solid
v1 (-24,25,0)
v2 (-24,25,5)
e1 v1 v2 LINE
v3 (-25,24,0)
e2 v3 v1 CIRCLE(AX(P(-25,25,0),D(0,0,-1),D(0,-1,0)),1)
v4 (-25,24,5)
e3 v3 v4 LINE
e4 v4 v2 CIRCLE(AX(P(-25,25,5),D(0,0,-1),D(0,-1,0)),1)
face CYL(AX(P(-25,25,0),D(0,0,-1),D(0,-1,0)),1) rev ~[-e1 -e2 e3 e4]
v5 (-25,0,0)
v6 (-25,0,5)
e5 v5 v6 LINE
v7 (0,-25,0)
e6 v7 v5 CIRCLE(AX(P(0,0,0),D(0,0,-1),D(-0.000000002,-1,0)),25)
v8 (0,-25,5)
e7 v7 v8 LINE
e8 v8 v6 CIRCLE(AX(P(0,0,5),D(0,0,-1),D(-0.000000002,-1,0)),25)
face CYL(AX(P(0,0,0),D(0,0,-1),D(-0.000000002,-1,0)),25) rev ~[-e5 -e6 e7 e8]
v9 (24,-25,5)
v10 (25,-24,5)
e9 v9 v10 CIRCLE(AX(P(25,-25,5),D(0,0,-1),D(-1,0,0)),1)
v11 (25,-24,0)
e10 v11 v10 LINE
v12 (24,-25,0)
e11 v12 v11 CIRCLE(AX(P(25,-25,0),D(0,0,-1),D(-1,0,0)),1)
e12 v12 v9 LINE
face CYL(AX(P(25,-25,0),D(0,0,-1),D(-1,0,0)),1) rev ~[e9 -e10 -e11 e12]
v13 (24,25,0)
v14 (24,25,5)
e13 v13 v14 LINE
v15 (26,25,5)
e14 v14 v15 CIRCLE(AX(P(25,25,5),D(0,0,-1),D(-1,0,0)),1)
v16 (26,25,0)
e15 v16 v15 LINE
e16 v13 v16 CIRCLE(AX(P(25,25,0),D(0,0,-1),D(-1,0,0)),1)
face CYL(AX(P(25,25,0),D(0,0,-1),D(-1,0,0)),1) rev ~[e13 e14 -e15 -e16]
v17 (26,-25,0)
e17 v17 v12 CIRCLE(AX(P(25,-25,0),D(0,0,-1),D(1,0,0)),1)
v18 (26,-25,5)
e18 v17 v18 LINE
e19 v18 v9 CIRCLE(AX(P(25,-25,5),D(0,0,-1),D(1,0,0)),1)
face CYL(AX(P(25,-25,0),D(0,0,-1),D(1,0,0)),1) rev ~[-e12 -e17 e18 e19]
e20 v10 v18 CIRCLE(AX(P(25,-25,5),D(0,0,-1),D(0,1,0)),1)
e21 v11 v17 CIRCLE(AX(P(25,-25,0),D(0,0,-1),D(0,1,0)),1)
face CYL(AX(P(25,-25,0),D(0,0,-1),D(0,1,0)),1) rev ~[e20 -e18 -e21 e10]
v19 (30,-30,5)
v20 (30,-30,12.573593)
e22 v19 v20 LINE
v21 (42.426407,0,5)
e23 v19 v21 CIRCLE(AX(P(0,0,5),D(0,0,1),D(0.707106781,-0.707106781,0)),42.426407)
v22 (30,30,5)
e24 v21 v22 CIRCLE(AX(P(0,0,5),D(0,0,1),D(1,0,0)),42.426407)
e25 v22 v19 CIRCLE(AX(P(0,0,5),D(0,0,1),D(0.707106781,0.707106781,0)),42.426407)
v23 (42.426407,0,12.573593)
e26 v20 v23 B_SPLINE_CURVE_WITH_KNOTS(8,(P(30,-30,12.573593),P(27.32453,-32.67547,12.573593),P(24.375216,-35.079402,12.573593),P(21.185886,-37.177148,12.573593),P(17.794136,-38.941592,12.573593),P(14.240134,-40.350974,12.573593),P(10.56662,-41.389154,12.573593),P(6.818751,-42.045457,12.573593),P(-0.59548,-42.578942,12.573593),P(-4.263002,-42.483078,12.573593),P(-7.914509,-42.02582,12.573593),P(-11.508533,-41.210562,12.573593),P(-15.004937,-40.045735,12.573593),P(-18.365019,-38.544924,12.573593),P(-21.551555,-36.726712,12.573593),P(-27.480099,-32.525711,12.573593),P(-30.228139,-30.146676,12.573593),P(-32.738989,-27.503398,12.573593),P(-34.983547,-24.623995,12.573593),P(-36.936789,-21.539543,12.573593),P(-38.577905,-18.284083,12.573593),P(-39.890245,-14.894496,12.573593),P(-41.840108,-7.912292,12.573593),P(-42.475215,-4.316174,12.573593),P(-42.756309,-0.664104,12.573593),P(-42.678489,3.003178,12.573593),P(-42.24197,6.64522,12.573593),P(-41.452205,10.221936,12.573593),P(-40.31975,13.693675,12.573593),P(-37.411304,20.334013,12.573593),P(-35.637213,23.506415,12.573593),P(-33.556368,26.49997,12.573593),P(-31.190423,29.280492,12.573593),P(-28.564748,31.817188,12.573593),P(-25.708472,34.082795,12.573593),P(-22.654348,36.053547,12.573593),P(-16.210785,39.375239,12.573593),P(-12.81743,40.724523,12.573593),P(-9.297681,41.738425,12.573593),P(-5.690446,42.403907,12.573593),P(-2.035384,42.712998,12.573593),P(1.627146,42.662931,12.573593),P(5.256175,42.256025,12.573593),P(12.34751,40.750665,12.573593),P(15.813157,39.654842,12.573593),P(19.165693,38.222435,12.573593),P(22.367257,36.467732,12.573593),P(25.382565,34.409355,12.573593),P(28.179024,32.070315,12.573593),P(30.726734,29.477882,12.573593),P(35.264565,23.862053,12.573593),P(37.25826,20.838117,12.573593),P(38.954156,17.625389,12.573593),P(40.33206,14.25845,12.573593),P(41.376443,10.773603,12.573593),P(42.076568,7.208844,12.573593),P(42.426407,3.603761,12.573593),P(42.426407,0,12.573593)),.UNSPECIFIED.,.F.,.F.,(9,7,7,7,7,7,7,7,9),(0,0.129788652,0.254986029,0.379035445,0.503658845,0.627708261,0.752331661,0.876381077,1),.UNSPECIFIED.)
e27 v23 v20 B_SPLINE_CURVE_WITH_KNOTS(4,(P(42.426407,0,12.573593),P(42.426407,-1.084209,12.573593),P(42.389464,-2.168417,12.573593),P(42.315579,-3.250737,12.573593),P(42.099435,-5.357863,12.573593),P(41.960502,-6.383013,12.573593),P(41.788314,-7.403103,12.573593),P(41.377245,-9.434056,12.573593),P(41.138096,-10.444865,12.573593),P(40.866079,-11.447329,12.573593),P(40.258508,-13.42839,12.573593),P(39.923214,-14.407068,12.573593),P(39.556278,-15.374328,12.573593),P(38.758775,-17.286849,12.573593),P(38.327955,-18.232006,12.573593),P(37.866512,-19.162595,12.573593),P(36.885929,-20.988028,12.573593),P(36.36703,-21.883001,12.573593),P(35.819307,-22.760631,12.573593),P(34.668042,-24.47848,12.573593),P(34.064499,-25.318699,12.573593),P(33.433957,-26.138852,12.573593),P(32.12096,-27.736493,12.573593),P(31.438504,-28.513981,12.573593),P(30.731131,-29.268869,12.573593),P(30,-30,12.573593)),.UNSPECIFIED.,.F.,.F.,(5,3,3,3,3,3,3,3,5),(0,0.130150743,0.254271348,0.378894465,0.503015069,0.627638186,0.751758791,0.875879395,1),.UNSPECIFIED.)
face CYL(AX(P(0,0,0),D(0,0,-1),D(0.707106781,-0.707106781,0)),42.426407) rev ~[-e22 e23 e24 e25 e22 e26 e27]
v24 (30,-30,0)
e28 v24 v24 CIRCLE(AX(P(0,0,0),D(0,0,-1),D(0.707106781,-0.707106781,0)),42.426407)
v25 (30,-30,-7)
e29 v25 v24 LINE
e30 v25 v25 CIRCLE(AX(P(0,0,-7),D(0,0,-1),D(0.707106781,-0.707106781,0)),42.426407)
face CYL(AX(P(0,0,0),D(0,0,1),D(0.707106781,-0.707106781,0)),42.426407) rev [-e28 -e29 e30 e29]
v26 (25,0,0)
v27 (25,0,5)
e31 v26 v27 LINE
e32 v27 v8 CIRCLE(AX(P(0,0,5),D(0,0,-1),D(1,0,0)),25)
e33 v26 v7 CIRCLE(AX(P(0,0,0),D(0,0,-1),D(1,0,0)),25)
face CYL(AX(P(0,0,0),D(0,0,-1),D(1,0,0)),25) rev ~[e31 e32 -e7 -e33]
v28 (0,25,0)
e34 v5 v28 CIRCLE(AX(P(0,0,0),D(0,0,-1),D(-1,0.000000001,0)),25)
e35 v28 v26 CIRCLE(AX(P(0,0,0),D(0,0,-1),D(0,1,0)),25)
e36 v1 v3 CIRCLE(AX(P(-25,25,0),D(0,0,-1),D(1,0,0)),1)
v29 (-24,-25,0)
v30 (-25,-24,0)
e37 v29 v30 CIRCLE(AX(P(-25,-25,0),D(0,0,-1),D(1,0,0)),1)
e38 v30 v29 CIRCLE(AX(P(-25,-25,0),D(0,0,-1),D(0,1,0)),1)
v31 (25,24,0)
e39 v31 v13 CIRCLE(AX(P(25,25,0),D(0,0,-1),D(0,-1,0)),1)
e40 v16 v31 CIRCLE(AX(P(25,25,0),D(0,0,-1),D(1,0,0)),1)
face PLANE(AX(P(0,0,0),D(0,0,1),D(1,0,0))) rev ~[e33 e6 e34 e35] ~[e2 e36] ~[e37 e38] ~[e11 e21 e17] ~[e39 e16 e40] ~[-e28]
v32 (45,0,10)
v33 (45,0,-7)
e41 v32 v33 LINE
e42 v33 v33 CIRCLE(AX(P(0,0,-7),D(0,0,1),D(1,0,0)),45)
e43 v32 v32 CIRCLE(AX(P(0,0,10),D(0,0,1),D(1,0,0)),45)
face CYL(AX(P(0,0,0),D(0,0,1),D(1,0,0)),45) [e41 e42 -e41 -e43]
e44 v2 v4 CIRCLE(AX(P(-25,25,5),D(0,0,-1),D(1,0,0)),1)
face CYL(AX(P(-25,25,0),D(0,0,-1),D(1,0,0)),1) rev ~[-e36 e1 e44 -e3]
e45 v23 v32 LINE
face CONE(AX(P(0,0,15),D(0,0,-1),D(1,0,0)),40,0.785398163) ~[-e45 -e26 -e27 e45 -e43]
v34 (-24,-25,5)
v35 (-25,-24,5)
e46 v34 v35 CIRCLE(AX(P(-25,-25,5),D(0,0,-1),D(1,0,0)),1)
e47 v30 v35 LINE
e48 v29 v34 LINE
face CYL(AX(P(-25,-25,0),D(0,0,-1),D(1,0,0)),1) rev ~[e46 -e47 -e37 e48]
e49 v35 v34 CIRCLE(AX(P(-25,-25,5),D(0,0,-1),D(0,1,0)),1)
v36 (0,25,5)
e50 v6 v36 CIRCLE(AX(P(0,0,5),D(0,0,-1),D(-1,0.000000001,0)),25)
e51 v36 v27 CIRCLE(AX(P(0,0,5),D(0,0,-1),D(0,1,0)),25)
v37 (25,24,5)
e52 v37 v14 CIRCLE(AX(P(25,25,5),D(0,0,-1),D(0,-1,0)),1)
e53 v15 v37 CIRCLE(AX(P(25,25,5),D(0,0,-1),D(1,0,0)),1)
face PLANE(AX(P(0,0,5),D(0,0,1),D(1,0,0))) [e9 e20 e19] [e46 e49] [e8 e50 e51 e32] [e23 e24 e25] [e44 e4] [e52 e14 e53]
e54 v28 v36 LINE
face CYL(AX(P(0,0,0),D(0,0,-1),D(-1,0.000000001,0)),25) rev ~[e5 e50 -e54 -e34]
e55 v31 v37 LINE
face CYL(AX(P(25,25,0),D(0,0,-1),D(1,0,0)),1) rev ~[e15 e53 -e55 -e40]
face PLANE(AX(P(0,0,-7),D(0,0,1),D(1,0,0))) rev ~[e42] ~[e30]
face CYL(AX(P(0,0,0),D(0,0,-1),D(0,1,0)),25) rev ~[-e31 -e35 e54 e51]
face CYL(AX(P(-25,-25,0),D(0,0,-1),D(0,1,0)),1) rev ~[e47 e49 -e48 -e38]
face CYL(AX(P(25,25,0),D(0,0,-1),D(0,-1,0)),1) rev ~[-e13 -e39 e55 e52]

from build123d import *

# Parameters (mm, degrees)
F0_W     = 60
F0_H     = 60
F1_DEPTH = 5
F0_R     = 45
F2_DEPTH = 15
F4_DEPTH = 4
F5_DEPTH = 7


# Not quite as in the source:
# - a fillet or chamfer that OpenCascade refuses, or shapes differently, is made with other operations: its cross-section is extruded or revolved along the edge and cut away or added


with BuildPart() as f1:
    # F0 (on Top) → F1 (new body)
    with BuildSketch(Plane.XY):
        Rectangle(F0_W, F0_H)
        with BuildLine():
            Line((25, 24), (25, 0))
            Line((25, 0), (25, -24))
            ThreePointArc((25, -24), (25.7071067812, -24.2928932188), (26, -25))
            ThreePointArc((26, -25), (25, -26), (24, -25))
            Line((24, -25), (-5.83e-08, -25))
            Line((-5.83e-08, -25), (-24, -25))
            ThreePointArc((-24, -25), (-25.7071067812, -25.7071067812), (-25, -24))
            Line((-25, -24), (-25, 2.61e-08))
            Line((-25, 2.61e-08), (-25, 24))
            ThreePointArc((-25, 24), (-25.7071067812, 25.7071067812), (-24, 25))
            Line((-24, 25), (0, 25))
            Line((0, 25), (24, 25))
            ThreePointArc((24, 25), (25, 26), (26, 25))
            ThreePointArc((26, 25), (25.7071067812, 24.2928932188), (25, 24))
        make_face(mode=Mode.SUBTRACT)
        with BuildLine():
            ThreePointArc((0, 25), (17.6776695297, 17.6776695297), (25, 0))
            Line((25, 0), (25, 24))
            ThreePointArc((25, 24), (24.2928932188, 24.2928932188), (24, 25))
            Line((24, 25), (0, 25))
        make_face()
        with BuildLine():
            Line((30, 30), (30, -30))
            ThreePointArc((30, -30), (39.1968889463, -16.2358830044), (42.4264068712, 0))
            ThreePointArc((42.4264068712, 0), (39.1968889463, 16.2358830044), (30, 30))
        make_face()
        with BuildLine():
            ThreePointArc((-30, -30), (0, -42.4264068712), (30, -30))
            Line((30, -30), (-30, -30))
        make_face()
        with BuildLine():
            ThreePointArc((-30, 30), (-42.4264068712, 0), (-30, -30))
            Line((-30, -30), (-30, 30))
        make_face()
        with BuildLine():
            Line((-24, -25), (-5.83e-08, -25))
            ThreePointArc((-5.83e-08, -25), (-17.6776695595, -17.6776694998), (-25, 2.61e-08))
            Line((-25, 2.61e-08), (-25, -24))
            ThreePointArc((-25, -24), (-24.2928932188, -24.2928932188), (-24, -25))
        make_face()
        with BuildLine():
            Line((25, -24), (25, 0))
            ThreePointArc((25, 0), (17.677669509, -17.6776695503), (-5.83e-08, -25))
            Line((-5.83e-08, -25), (24, -25))
            ThreePointArc((24, -25), (24.2928932188, -24.2928932188), (25, -24))
        make_face()
        with BuildLine():
            ThreePointArc((-25, 2.61e-08), (-17.6776695204, 17.6776695389), (0, 25))
            Line((0, 25), (-24, 25))
            ThreePointArc((-24, 25), (-24.2928932188, 24.2928932188), (-25, 24))
            Line((-25, 24), (-25, 2.61e-08))
        make_face()
        with BuildLine():
            Line((-30, 30), (30, 30))
            ThreePointArc((30, 30), (0, 42.4264068712), (-30, 30))
        make_face()
    extrude(amount=F1_DEPTH)

    # F0 (on Top) → F2 (join)
    with BuildSketch(Plane.XY):
        Circle(F0_R)
        with BuildLine():
            ThreePointArc((42.4264068712, 0), (39.1968889463, -16.2358830044), (30, -30))
            ThreePointArc((30, -30), (0, -42.4264068712), (-30, -30))
            ThreePointArc((-30, -30), (-42.4264068712, 0), (-30, 30))
            ThreePointArc((-30, 30), (0, 42.4264068712), (30, 30))
            ThreePointArc((30, 30), (39.1968889463, 16.2358830044), (42.4264068712, 0))
        make_face(mode=Mode.SUBTRACT)
    extrude(amount=F2_DEPTH)

    # F3: chamfer of 5 on 1 edges, made by hand

    # F3_s1 → F3_t2 (revolve, cut)
    with BuildSketch(Plane.XZ):
        Polygon((40, 15), (45, 10), (45, 15), align=None)
    revolve(axis=Axis((0, 0, 15), (0, 0, 1)), mode=Mode.SUBTRACT)

    # F0 (on Top) → F4 (join)
    with BuildSketch(Plane.XY):
        Circle(F0_R)
        with BuildLine():
            ThreePointArc((42.4264068712, 0), (39.1968889463, -16.2358830044), (30, -30))
            ThreePointArc((30, -30), (0, -42.4264068712), (-30, -30))
            ThreePointArc((-30, -30), (-42.4264068712, 0), (-30, 30))
            ThreePointArc((-30, 30), (0, 42.4264068712), (30, 30))
            ThreePointArc((30, 30), (39.1968889463, 16.2358830044), (42.4264068712, 0))
        make_face(mode=Mode.SUBTRACT)
    extrude(amount=-F4_DEPTH)

    # F0 (on Top) → F5 (join)
    with BuildSketch(Plane.XY):
        Circle(F0_R)
        with BuildLine():
            ThreePointArc((42.4264068712, 0), (39.1968889463, -16.2358830044), (30, -30))
            ThreePointArc((30, -30), (0, -42.4264068712), (-30, -30))
            ThreePointArc((-30, -30), (-42.4264068712, 0), (-30, 30))
            ThreePointArc((-30, 30), (0, 42.4264068712), (30, 30))
            ThreePointArc((30, 30), (39.1968889463, 16.2358830044), (42.4264068712, 0))
        make_face(mode=Mode.SUBTRACT)
    extrude(amount=-F5_DEPTH)


solid = f1.part
